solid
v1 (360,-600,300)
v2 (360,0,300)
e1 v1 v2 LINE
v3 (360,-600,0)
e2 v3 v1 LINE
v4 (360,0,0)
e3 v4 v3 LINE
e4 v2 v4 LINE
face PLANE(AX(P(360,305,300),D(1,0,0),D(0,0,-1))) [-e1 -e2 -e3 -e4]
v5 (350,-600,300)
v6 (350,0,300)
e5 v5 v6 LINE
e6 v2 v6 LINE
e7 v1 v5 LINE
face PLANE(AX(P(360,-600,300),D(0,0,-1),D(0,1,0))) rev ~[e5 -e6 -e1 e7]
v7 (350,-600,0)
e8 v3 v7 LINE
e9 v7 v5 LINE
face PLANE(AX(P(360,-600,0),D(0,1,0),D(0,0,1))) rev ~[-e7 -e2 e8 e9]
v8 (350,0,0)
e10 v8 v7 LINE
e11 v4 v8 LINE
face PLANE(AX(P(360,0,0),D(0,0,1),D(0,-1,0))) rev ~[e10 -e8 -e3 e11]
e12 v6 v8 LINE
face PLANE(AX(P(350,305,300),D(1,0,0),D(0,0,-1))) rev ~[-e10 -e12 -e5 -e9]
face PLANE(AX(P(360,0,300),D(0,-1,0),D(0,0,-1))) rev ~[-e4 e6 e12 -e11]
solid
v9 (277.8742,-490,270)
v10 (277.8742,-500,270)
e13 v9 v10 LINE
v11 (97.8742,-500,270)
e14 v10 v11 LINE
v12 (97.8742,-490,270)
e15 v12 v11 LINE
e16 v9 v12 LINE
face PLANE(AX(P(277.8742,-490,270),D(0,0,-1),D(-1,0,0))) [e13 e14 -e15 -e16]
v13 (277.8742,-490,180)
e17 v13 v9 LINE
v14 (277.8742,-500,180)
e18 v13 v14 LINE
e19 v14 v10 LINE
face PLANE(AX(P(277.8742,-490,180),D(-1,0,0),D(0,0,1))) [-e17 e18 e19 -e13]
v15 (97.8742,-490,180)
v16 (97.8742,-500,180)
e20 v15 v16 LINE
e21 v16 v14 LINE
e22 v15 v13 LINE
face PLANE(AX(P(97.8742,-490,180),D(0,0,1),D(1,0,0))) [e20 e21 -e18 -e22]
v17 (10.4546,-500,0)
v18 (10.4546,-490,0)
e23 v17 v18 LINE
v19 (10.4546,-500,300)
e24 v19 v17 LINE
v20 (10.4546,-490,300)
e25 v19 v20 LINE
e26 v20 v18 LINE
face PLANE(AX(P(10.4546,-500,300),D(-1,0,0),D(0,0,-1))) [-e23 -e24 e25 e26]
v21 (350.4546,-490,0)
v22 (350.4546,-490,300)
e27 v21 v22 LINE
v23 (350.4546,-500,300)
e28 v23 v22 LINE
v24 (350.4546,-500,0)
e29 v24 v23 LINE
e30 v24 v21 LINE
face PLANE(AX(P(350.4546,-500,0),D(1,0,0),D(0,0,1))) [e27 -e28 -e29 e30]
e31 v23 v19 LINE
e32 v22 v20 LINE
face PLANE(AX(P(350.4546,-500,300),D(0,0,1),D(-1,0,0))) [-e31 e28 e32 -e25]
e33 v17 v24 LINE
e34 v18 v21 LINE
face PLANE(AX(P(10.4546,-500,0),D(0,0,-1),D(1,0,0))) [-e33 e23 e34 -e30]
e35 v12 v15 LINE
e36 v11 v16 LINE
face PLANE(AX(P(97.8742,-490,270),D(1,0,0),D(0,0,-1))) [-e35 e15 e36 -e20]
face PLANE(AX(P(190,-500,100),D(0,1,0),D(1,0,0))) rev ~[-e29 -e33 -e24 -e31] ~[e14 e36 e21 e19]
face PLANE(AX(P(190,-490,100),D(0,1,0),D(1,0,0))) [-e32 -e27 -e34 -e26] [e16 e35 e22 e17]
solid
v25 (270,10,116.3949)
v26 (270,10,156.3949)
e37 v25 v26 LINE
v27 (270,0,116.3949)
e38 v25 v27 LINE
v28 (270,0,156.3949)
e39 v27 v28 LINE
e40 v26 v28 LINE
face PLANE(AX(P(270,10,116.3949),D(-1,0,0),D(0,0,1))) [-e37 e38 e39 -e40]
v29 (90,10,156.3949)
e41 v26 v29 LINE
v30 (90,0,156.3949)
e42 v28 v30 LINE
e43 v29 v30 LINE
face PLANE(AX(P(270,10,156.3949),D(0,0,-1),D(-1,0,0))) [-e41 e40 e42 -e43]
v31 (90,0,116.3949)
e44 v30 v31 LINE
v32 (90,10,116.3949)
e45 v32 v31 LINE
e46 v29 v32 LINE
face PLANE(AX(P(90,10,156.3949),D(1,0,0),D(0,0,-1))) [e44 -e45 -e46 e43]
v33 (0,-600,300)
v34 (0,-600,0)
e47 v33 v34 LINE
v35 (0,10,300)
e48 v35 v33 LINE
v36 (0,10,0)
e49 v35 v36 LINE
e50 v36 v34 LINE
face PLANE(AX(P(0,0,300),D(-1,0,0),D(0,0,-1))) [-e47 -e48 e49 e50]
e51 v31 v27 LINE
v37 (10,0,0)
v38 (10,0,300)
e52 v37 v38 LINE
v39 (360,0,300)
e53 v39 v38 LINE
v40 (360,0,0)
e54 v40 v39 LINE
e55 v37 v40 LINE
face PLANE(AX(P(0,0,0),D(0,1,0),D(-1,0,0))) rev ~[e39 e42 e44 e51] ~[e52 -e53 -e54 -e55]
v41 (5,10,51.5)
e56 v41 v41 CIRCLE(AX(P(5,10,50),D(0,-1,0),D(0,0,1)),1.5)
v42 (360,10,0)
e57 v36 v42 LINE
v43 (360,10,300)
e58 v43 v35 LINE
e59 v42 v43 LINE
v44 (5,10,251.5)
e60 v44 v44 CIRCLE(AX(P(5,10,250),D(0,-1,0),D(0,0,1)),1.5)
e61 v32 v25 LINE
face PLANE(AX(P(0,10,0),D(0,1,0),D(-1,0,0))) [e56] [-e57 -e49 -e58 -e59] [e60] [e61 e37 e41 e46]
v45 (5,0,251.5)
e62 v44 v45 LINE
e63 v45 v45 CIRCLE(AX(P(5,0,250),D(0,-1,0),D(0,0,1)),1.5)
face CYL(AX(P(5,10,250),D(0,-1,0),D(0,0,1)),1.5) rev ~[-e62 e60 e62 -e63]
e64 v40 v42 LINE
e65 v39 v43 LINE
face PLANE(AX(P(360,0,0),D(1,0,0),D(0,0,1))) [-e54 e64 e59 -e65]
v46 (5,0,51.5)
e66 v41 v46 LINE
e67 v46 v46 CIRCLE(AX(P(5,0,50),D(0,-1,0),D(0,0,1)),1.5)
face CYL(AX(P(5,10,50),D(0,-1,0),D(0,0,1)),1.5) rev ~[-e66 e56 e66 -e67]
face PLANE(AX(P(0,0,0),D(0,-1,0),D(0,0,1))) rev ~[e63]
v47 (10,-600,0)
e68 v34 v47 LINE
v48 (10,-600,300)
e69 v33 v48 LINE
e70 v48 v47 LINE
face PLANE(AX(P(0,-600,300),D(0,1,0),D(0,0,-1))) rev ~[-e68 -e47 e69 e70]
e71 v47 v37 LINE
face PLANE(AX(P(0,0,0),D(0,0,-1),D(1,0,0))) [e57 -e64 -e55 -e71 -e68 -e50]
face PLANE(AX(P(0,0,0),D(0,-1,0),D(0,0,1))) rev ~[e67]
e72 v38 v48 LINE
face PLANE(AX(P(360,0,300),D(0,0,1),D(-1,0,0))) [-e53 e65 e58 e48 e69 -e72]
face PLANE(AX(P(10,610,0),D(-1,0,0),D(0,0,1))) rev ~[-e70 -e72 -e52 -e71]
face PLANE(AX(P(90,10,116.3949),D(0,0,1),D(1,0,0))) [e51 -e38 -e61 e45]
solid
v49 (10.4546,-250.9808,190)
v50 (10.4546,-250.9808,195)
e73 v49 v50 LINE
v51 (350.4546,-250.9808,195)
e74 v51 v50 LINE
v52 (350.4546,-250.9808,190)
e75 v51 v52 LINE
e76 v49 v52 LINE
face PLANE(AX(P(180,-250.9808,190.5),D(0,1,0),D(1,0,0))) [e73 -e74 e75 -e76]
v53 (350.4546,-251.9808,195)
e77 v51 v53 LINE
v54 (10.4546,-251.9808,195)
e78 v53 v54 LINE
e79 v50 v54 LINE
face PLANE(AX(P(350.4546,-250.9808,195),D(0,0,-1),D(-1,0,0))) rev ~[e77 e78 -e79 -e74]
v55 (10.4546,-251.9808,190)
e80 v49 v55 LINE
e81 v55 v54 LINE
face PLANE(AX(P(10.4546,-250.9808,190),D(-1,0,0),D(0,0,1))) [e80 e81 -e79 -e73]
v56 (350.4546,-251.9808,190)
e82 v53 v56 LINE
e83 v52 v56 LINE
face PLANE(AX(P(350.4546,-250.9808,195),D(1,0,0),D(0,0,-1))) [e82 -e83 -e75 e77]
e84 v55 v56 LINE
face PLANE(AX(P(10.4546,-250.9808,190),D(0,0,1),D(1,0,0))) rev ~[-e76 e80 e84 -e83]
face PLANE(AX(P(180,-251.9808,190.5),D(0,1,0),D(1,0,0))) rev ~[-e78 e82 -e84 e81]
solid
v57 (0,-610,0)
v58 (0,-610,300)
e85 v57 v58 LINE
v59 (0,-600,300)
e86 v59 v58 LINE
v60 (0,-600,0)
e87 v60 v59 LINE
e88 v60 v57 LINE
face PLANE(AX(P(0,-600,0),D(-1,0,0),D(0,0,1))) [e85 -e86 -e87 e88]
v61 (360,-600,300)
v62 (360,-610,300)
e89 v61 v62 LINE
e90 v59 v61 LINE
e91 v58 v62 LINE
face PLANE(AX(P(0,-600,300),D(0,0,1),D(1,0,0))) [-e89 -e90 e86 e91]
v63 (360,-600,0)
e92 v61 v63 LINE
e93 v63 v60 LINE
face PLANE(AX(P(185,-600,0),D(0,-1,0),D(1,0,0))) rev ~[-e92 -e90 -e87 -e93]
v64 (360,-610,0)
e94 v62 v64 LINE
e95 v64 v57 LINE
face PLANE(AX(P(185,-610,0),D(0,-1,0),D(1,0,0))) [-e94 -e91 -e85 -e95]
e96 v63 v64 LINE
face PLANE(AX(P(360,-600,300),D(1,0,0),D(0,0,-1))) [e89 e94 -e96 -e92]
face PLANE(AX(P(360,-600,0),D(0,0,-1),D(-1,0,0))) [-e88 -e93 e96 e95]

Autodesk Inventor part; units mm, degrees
ref_plane "YZ Plane" through (0, 0, 0) normal (1, 0, 0) x (0, 1, 0)
ref_plane "XZ Plane" through (0, 0, 0) normal (0, 1, 0) x (-1, 0, 0)
ref_plane "XY Plane" through (0, 0, 0) normal (0, 0, 1) x (1, 0, 0)
sketch "Skizze2" plane through (0, 0, 0) normal (0, 1, 0) x (-1, 0, 0)
  line L0 (-360, 300) -> (0, 300)
  line L1 (0, 300) -> (0, 0)
  line L2 (0, 0) -> (-360, 0)
  line L3 (-360, 0) -> (-360, 300)
  line L4 (-360, 300) -> (0, 0) construction
  line L5 (0, 300) -> (-360, 0) construction
  point P0 (-180, 150)
  dimension "d6" = 360
  dimension "d7" = 300
extrude "Deckel oben" add sketch "Skizze2" along normal blind 10
hole "Bohrung1" at (5, 10, 50) direction (0, -1, 0) diameter 3 depth 20 tip angle 118
hole "Bohrung2" at (5, 10, 250) direction (0, -1, 0) diameter 3 depth 20 tip angle 118
ref_plane "Arbeitsebene5" through (185, -600, 0) normal (0, -1, 0) x (1, 0, 0)
sketch "Skizze8" plane through (185, -600, 0) normal (0, -1, 0) x (1, 0, 0)
  line L0 (-185, 300) -> (175, 300)
  line L1 (175, 300) -> (175, 0)
  line L2 (175, 0) -> (-185, 0)
  line L3 (-185, 0) -> (-185, 300)
  line L4 (-185, 300) -> (175, 0) construction
  line L5 (175, 300) -> (-185, 0) construction
  point P0 (-5, 150)
  dimension "d30" = 360
  dimension "d31" = 300
extrude "Boden" add sketch "Skizze8" along normal blind 10 separate body
sketch "Skizze9" plane through (360, 305, 300) normal (1, 0, 0) x (0, 0, -1)
  line L0 (0, -305) -> (300, -305)
  line L1 (300, -305) -> (300, -905)
  line L2 (300, -905) -> (0, -905)
  line L3 (0, -905) -> (0, -305)
  point P0 (300, -305)
  dimension "d35" = 600
  dimension "d60" = 300
  dimension "d63" = 0
extrude "Linke Wand" add sketch "Skizze9" against normal blind 10 separate body
ref_plane "Arbeitsebene4" through (185, -500, 0) normal (0, 1, 0) x (1, 0, 0)
sketch "Skizze10" plane through (190, -500, 100) normal (0, 1, 0) x (1, 0, 0)
  line L0 (-179.5454, 100) -> (160.4546, 100)
  line L1 (160.4546, 100) -> (160.4546, -200)
  line L2 (160.4546, -200) -> (-179.5454, -200)
  line L3 (-179.5454, -200) -> (-179.5454, 100)
  line L4 (-179.5454, 100) -> (160.4546, -200) construction
  line L5 (160.4546, 100) -> (-179.5454, -200) construction
  line L6 (-190, 100) -> (170, 100) projected
  point P0 (-9.5454, -50)
  dimension "d40" = 340
  dimension "d41" = 300
  dimension "d65" = 0
extrude "Zwischenboden" add sketch "Skizze10" along normal blind 10 separate body
sketch "Skizze11" plane through (0, 610, 0) normal (-1, 0, 0) x (0, 0, 1)
  line L0 (0, -610) -> (300, -610)
  line L1 (300, -610) -> (300, -1210)
  line L2 (300, -1210) -> (0, -1210)
  line L3 (0, -1210) -> (0, -610)
  point P0 (300, -610)
  dimension "d45" = 600
  dimension "d61" = 300
  dimension "d64" = 0
extrude "Rechte Wand" add sketch "Skizze11" against normal blind 10 bodies 1
sketch "Skizze15" plane through (190, -490, 100) normal (0, 1, 0) x (1, 0, 0)
  line L0 (-92.1258, -80) -> (87.8742, -80)
  line L1 (87.8742, -80) -> (87.8742, -170)
  line L2 (87.8742, -170) -> (-92.1258, -170)
  line L3 (-92.1258, -170) -> (-92.1258, -80)
  line L4 (-92.1258, -80) -> (87.8742, -170) construction
  line L5 (87.8742, -80) -> (-92.1258, -170) construction
  circle A0 centre (-185, -150) radius 1.5 projected
  circle A1 centre (-185, 50) radius 1.5 projected
  line L6 (-190, -200) -> (170, -200) projected
  line L7 (170, -200) -> (170, 100) projected
  line L8 (170, 100) -> (-190, 100) projected
  line L9 (-190, 100) -> (-190, -200) projected
  line L10 (170, 100) -> (-190, 100) projected
  line L11 (170, -200) -> (170, 100) projected
  point P0 (-2.1258, -125)
  dimension "d57" = 180
  dimension "d59" = 90
  dimension "d62" = 30
extrude "Abtropfgitter" cut sketch "Skizze15" against normal blind 20 contours L0 L1 L2 L3 bodies 4
sketch "Skizze16" plane through (0, 10, 0) normal (0, 1, 0) x (1, 0, 0)
  line L0 (50.5996, -54.7496) -> (230.5977, -55.5818) projected
  line L1 (230.5289, -70.4701) -> (50.5308, -69.6379) projected
  line L2 (90, -116.3949) -> (270, -116.3949)
  line L3 (270, -116.3949) -> (270, -156.3949)
  line L4 (270, -156.3949) -> (90, -156.3949)
  line L5 (90, -156.3949) -> (90, -116.3949)
  dimension "d71" = 40
  dimension "d72" = 180
extrude "öffnung oben" cut sketch "Skizze16" against normal blind 50 bodies 1
ref_plane "Arbeitsebene7" through (180, -250.9808, 190.5) normal (0, 1, 0) x (1, 0, 0)
sketch "Skizze17" plane through (180, -250.9808, 190.5) normal (0, 1, 0) x (1, 0, 0)
  line L0 (-25.2697, 55.6344) -> (-54.2694, 55.7685) projected
  line L1 (-169.5454, 190.5) -> (-169.5454, -109.5) projected
  line L2 (170.4546, -109.5) -> (170.4546, 190.5) projected
  line L3 (-169.5454, 0.5) -> (170.4546, 0.5)
  line L4 (170.4546, 0.5) -> (170.4546, -4.5)
  line L5 (170.4546, -4.5) -> (-169.5454, -4.5)
  line L6 (-169.5454, -4.5) -> (-169.5454, 0.5)
  point P0 (-180, 190.5)
  dimension "d75" = 5
  dimension "d76" = 340
extrude "ventilhalter stange" add sketch "Skizze17" against normal blind 1 bodies 4
properties part number "Spanplatten Gehäuse" material "Edelstahl, 440C"
